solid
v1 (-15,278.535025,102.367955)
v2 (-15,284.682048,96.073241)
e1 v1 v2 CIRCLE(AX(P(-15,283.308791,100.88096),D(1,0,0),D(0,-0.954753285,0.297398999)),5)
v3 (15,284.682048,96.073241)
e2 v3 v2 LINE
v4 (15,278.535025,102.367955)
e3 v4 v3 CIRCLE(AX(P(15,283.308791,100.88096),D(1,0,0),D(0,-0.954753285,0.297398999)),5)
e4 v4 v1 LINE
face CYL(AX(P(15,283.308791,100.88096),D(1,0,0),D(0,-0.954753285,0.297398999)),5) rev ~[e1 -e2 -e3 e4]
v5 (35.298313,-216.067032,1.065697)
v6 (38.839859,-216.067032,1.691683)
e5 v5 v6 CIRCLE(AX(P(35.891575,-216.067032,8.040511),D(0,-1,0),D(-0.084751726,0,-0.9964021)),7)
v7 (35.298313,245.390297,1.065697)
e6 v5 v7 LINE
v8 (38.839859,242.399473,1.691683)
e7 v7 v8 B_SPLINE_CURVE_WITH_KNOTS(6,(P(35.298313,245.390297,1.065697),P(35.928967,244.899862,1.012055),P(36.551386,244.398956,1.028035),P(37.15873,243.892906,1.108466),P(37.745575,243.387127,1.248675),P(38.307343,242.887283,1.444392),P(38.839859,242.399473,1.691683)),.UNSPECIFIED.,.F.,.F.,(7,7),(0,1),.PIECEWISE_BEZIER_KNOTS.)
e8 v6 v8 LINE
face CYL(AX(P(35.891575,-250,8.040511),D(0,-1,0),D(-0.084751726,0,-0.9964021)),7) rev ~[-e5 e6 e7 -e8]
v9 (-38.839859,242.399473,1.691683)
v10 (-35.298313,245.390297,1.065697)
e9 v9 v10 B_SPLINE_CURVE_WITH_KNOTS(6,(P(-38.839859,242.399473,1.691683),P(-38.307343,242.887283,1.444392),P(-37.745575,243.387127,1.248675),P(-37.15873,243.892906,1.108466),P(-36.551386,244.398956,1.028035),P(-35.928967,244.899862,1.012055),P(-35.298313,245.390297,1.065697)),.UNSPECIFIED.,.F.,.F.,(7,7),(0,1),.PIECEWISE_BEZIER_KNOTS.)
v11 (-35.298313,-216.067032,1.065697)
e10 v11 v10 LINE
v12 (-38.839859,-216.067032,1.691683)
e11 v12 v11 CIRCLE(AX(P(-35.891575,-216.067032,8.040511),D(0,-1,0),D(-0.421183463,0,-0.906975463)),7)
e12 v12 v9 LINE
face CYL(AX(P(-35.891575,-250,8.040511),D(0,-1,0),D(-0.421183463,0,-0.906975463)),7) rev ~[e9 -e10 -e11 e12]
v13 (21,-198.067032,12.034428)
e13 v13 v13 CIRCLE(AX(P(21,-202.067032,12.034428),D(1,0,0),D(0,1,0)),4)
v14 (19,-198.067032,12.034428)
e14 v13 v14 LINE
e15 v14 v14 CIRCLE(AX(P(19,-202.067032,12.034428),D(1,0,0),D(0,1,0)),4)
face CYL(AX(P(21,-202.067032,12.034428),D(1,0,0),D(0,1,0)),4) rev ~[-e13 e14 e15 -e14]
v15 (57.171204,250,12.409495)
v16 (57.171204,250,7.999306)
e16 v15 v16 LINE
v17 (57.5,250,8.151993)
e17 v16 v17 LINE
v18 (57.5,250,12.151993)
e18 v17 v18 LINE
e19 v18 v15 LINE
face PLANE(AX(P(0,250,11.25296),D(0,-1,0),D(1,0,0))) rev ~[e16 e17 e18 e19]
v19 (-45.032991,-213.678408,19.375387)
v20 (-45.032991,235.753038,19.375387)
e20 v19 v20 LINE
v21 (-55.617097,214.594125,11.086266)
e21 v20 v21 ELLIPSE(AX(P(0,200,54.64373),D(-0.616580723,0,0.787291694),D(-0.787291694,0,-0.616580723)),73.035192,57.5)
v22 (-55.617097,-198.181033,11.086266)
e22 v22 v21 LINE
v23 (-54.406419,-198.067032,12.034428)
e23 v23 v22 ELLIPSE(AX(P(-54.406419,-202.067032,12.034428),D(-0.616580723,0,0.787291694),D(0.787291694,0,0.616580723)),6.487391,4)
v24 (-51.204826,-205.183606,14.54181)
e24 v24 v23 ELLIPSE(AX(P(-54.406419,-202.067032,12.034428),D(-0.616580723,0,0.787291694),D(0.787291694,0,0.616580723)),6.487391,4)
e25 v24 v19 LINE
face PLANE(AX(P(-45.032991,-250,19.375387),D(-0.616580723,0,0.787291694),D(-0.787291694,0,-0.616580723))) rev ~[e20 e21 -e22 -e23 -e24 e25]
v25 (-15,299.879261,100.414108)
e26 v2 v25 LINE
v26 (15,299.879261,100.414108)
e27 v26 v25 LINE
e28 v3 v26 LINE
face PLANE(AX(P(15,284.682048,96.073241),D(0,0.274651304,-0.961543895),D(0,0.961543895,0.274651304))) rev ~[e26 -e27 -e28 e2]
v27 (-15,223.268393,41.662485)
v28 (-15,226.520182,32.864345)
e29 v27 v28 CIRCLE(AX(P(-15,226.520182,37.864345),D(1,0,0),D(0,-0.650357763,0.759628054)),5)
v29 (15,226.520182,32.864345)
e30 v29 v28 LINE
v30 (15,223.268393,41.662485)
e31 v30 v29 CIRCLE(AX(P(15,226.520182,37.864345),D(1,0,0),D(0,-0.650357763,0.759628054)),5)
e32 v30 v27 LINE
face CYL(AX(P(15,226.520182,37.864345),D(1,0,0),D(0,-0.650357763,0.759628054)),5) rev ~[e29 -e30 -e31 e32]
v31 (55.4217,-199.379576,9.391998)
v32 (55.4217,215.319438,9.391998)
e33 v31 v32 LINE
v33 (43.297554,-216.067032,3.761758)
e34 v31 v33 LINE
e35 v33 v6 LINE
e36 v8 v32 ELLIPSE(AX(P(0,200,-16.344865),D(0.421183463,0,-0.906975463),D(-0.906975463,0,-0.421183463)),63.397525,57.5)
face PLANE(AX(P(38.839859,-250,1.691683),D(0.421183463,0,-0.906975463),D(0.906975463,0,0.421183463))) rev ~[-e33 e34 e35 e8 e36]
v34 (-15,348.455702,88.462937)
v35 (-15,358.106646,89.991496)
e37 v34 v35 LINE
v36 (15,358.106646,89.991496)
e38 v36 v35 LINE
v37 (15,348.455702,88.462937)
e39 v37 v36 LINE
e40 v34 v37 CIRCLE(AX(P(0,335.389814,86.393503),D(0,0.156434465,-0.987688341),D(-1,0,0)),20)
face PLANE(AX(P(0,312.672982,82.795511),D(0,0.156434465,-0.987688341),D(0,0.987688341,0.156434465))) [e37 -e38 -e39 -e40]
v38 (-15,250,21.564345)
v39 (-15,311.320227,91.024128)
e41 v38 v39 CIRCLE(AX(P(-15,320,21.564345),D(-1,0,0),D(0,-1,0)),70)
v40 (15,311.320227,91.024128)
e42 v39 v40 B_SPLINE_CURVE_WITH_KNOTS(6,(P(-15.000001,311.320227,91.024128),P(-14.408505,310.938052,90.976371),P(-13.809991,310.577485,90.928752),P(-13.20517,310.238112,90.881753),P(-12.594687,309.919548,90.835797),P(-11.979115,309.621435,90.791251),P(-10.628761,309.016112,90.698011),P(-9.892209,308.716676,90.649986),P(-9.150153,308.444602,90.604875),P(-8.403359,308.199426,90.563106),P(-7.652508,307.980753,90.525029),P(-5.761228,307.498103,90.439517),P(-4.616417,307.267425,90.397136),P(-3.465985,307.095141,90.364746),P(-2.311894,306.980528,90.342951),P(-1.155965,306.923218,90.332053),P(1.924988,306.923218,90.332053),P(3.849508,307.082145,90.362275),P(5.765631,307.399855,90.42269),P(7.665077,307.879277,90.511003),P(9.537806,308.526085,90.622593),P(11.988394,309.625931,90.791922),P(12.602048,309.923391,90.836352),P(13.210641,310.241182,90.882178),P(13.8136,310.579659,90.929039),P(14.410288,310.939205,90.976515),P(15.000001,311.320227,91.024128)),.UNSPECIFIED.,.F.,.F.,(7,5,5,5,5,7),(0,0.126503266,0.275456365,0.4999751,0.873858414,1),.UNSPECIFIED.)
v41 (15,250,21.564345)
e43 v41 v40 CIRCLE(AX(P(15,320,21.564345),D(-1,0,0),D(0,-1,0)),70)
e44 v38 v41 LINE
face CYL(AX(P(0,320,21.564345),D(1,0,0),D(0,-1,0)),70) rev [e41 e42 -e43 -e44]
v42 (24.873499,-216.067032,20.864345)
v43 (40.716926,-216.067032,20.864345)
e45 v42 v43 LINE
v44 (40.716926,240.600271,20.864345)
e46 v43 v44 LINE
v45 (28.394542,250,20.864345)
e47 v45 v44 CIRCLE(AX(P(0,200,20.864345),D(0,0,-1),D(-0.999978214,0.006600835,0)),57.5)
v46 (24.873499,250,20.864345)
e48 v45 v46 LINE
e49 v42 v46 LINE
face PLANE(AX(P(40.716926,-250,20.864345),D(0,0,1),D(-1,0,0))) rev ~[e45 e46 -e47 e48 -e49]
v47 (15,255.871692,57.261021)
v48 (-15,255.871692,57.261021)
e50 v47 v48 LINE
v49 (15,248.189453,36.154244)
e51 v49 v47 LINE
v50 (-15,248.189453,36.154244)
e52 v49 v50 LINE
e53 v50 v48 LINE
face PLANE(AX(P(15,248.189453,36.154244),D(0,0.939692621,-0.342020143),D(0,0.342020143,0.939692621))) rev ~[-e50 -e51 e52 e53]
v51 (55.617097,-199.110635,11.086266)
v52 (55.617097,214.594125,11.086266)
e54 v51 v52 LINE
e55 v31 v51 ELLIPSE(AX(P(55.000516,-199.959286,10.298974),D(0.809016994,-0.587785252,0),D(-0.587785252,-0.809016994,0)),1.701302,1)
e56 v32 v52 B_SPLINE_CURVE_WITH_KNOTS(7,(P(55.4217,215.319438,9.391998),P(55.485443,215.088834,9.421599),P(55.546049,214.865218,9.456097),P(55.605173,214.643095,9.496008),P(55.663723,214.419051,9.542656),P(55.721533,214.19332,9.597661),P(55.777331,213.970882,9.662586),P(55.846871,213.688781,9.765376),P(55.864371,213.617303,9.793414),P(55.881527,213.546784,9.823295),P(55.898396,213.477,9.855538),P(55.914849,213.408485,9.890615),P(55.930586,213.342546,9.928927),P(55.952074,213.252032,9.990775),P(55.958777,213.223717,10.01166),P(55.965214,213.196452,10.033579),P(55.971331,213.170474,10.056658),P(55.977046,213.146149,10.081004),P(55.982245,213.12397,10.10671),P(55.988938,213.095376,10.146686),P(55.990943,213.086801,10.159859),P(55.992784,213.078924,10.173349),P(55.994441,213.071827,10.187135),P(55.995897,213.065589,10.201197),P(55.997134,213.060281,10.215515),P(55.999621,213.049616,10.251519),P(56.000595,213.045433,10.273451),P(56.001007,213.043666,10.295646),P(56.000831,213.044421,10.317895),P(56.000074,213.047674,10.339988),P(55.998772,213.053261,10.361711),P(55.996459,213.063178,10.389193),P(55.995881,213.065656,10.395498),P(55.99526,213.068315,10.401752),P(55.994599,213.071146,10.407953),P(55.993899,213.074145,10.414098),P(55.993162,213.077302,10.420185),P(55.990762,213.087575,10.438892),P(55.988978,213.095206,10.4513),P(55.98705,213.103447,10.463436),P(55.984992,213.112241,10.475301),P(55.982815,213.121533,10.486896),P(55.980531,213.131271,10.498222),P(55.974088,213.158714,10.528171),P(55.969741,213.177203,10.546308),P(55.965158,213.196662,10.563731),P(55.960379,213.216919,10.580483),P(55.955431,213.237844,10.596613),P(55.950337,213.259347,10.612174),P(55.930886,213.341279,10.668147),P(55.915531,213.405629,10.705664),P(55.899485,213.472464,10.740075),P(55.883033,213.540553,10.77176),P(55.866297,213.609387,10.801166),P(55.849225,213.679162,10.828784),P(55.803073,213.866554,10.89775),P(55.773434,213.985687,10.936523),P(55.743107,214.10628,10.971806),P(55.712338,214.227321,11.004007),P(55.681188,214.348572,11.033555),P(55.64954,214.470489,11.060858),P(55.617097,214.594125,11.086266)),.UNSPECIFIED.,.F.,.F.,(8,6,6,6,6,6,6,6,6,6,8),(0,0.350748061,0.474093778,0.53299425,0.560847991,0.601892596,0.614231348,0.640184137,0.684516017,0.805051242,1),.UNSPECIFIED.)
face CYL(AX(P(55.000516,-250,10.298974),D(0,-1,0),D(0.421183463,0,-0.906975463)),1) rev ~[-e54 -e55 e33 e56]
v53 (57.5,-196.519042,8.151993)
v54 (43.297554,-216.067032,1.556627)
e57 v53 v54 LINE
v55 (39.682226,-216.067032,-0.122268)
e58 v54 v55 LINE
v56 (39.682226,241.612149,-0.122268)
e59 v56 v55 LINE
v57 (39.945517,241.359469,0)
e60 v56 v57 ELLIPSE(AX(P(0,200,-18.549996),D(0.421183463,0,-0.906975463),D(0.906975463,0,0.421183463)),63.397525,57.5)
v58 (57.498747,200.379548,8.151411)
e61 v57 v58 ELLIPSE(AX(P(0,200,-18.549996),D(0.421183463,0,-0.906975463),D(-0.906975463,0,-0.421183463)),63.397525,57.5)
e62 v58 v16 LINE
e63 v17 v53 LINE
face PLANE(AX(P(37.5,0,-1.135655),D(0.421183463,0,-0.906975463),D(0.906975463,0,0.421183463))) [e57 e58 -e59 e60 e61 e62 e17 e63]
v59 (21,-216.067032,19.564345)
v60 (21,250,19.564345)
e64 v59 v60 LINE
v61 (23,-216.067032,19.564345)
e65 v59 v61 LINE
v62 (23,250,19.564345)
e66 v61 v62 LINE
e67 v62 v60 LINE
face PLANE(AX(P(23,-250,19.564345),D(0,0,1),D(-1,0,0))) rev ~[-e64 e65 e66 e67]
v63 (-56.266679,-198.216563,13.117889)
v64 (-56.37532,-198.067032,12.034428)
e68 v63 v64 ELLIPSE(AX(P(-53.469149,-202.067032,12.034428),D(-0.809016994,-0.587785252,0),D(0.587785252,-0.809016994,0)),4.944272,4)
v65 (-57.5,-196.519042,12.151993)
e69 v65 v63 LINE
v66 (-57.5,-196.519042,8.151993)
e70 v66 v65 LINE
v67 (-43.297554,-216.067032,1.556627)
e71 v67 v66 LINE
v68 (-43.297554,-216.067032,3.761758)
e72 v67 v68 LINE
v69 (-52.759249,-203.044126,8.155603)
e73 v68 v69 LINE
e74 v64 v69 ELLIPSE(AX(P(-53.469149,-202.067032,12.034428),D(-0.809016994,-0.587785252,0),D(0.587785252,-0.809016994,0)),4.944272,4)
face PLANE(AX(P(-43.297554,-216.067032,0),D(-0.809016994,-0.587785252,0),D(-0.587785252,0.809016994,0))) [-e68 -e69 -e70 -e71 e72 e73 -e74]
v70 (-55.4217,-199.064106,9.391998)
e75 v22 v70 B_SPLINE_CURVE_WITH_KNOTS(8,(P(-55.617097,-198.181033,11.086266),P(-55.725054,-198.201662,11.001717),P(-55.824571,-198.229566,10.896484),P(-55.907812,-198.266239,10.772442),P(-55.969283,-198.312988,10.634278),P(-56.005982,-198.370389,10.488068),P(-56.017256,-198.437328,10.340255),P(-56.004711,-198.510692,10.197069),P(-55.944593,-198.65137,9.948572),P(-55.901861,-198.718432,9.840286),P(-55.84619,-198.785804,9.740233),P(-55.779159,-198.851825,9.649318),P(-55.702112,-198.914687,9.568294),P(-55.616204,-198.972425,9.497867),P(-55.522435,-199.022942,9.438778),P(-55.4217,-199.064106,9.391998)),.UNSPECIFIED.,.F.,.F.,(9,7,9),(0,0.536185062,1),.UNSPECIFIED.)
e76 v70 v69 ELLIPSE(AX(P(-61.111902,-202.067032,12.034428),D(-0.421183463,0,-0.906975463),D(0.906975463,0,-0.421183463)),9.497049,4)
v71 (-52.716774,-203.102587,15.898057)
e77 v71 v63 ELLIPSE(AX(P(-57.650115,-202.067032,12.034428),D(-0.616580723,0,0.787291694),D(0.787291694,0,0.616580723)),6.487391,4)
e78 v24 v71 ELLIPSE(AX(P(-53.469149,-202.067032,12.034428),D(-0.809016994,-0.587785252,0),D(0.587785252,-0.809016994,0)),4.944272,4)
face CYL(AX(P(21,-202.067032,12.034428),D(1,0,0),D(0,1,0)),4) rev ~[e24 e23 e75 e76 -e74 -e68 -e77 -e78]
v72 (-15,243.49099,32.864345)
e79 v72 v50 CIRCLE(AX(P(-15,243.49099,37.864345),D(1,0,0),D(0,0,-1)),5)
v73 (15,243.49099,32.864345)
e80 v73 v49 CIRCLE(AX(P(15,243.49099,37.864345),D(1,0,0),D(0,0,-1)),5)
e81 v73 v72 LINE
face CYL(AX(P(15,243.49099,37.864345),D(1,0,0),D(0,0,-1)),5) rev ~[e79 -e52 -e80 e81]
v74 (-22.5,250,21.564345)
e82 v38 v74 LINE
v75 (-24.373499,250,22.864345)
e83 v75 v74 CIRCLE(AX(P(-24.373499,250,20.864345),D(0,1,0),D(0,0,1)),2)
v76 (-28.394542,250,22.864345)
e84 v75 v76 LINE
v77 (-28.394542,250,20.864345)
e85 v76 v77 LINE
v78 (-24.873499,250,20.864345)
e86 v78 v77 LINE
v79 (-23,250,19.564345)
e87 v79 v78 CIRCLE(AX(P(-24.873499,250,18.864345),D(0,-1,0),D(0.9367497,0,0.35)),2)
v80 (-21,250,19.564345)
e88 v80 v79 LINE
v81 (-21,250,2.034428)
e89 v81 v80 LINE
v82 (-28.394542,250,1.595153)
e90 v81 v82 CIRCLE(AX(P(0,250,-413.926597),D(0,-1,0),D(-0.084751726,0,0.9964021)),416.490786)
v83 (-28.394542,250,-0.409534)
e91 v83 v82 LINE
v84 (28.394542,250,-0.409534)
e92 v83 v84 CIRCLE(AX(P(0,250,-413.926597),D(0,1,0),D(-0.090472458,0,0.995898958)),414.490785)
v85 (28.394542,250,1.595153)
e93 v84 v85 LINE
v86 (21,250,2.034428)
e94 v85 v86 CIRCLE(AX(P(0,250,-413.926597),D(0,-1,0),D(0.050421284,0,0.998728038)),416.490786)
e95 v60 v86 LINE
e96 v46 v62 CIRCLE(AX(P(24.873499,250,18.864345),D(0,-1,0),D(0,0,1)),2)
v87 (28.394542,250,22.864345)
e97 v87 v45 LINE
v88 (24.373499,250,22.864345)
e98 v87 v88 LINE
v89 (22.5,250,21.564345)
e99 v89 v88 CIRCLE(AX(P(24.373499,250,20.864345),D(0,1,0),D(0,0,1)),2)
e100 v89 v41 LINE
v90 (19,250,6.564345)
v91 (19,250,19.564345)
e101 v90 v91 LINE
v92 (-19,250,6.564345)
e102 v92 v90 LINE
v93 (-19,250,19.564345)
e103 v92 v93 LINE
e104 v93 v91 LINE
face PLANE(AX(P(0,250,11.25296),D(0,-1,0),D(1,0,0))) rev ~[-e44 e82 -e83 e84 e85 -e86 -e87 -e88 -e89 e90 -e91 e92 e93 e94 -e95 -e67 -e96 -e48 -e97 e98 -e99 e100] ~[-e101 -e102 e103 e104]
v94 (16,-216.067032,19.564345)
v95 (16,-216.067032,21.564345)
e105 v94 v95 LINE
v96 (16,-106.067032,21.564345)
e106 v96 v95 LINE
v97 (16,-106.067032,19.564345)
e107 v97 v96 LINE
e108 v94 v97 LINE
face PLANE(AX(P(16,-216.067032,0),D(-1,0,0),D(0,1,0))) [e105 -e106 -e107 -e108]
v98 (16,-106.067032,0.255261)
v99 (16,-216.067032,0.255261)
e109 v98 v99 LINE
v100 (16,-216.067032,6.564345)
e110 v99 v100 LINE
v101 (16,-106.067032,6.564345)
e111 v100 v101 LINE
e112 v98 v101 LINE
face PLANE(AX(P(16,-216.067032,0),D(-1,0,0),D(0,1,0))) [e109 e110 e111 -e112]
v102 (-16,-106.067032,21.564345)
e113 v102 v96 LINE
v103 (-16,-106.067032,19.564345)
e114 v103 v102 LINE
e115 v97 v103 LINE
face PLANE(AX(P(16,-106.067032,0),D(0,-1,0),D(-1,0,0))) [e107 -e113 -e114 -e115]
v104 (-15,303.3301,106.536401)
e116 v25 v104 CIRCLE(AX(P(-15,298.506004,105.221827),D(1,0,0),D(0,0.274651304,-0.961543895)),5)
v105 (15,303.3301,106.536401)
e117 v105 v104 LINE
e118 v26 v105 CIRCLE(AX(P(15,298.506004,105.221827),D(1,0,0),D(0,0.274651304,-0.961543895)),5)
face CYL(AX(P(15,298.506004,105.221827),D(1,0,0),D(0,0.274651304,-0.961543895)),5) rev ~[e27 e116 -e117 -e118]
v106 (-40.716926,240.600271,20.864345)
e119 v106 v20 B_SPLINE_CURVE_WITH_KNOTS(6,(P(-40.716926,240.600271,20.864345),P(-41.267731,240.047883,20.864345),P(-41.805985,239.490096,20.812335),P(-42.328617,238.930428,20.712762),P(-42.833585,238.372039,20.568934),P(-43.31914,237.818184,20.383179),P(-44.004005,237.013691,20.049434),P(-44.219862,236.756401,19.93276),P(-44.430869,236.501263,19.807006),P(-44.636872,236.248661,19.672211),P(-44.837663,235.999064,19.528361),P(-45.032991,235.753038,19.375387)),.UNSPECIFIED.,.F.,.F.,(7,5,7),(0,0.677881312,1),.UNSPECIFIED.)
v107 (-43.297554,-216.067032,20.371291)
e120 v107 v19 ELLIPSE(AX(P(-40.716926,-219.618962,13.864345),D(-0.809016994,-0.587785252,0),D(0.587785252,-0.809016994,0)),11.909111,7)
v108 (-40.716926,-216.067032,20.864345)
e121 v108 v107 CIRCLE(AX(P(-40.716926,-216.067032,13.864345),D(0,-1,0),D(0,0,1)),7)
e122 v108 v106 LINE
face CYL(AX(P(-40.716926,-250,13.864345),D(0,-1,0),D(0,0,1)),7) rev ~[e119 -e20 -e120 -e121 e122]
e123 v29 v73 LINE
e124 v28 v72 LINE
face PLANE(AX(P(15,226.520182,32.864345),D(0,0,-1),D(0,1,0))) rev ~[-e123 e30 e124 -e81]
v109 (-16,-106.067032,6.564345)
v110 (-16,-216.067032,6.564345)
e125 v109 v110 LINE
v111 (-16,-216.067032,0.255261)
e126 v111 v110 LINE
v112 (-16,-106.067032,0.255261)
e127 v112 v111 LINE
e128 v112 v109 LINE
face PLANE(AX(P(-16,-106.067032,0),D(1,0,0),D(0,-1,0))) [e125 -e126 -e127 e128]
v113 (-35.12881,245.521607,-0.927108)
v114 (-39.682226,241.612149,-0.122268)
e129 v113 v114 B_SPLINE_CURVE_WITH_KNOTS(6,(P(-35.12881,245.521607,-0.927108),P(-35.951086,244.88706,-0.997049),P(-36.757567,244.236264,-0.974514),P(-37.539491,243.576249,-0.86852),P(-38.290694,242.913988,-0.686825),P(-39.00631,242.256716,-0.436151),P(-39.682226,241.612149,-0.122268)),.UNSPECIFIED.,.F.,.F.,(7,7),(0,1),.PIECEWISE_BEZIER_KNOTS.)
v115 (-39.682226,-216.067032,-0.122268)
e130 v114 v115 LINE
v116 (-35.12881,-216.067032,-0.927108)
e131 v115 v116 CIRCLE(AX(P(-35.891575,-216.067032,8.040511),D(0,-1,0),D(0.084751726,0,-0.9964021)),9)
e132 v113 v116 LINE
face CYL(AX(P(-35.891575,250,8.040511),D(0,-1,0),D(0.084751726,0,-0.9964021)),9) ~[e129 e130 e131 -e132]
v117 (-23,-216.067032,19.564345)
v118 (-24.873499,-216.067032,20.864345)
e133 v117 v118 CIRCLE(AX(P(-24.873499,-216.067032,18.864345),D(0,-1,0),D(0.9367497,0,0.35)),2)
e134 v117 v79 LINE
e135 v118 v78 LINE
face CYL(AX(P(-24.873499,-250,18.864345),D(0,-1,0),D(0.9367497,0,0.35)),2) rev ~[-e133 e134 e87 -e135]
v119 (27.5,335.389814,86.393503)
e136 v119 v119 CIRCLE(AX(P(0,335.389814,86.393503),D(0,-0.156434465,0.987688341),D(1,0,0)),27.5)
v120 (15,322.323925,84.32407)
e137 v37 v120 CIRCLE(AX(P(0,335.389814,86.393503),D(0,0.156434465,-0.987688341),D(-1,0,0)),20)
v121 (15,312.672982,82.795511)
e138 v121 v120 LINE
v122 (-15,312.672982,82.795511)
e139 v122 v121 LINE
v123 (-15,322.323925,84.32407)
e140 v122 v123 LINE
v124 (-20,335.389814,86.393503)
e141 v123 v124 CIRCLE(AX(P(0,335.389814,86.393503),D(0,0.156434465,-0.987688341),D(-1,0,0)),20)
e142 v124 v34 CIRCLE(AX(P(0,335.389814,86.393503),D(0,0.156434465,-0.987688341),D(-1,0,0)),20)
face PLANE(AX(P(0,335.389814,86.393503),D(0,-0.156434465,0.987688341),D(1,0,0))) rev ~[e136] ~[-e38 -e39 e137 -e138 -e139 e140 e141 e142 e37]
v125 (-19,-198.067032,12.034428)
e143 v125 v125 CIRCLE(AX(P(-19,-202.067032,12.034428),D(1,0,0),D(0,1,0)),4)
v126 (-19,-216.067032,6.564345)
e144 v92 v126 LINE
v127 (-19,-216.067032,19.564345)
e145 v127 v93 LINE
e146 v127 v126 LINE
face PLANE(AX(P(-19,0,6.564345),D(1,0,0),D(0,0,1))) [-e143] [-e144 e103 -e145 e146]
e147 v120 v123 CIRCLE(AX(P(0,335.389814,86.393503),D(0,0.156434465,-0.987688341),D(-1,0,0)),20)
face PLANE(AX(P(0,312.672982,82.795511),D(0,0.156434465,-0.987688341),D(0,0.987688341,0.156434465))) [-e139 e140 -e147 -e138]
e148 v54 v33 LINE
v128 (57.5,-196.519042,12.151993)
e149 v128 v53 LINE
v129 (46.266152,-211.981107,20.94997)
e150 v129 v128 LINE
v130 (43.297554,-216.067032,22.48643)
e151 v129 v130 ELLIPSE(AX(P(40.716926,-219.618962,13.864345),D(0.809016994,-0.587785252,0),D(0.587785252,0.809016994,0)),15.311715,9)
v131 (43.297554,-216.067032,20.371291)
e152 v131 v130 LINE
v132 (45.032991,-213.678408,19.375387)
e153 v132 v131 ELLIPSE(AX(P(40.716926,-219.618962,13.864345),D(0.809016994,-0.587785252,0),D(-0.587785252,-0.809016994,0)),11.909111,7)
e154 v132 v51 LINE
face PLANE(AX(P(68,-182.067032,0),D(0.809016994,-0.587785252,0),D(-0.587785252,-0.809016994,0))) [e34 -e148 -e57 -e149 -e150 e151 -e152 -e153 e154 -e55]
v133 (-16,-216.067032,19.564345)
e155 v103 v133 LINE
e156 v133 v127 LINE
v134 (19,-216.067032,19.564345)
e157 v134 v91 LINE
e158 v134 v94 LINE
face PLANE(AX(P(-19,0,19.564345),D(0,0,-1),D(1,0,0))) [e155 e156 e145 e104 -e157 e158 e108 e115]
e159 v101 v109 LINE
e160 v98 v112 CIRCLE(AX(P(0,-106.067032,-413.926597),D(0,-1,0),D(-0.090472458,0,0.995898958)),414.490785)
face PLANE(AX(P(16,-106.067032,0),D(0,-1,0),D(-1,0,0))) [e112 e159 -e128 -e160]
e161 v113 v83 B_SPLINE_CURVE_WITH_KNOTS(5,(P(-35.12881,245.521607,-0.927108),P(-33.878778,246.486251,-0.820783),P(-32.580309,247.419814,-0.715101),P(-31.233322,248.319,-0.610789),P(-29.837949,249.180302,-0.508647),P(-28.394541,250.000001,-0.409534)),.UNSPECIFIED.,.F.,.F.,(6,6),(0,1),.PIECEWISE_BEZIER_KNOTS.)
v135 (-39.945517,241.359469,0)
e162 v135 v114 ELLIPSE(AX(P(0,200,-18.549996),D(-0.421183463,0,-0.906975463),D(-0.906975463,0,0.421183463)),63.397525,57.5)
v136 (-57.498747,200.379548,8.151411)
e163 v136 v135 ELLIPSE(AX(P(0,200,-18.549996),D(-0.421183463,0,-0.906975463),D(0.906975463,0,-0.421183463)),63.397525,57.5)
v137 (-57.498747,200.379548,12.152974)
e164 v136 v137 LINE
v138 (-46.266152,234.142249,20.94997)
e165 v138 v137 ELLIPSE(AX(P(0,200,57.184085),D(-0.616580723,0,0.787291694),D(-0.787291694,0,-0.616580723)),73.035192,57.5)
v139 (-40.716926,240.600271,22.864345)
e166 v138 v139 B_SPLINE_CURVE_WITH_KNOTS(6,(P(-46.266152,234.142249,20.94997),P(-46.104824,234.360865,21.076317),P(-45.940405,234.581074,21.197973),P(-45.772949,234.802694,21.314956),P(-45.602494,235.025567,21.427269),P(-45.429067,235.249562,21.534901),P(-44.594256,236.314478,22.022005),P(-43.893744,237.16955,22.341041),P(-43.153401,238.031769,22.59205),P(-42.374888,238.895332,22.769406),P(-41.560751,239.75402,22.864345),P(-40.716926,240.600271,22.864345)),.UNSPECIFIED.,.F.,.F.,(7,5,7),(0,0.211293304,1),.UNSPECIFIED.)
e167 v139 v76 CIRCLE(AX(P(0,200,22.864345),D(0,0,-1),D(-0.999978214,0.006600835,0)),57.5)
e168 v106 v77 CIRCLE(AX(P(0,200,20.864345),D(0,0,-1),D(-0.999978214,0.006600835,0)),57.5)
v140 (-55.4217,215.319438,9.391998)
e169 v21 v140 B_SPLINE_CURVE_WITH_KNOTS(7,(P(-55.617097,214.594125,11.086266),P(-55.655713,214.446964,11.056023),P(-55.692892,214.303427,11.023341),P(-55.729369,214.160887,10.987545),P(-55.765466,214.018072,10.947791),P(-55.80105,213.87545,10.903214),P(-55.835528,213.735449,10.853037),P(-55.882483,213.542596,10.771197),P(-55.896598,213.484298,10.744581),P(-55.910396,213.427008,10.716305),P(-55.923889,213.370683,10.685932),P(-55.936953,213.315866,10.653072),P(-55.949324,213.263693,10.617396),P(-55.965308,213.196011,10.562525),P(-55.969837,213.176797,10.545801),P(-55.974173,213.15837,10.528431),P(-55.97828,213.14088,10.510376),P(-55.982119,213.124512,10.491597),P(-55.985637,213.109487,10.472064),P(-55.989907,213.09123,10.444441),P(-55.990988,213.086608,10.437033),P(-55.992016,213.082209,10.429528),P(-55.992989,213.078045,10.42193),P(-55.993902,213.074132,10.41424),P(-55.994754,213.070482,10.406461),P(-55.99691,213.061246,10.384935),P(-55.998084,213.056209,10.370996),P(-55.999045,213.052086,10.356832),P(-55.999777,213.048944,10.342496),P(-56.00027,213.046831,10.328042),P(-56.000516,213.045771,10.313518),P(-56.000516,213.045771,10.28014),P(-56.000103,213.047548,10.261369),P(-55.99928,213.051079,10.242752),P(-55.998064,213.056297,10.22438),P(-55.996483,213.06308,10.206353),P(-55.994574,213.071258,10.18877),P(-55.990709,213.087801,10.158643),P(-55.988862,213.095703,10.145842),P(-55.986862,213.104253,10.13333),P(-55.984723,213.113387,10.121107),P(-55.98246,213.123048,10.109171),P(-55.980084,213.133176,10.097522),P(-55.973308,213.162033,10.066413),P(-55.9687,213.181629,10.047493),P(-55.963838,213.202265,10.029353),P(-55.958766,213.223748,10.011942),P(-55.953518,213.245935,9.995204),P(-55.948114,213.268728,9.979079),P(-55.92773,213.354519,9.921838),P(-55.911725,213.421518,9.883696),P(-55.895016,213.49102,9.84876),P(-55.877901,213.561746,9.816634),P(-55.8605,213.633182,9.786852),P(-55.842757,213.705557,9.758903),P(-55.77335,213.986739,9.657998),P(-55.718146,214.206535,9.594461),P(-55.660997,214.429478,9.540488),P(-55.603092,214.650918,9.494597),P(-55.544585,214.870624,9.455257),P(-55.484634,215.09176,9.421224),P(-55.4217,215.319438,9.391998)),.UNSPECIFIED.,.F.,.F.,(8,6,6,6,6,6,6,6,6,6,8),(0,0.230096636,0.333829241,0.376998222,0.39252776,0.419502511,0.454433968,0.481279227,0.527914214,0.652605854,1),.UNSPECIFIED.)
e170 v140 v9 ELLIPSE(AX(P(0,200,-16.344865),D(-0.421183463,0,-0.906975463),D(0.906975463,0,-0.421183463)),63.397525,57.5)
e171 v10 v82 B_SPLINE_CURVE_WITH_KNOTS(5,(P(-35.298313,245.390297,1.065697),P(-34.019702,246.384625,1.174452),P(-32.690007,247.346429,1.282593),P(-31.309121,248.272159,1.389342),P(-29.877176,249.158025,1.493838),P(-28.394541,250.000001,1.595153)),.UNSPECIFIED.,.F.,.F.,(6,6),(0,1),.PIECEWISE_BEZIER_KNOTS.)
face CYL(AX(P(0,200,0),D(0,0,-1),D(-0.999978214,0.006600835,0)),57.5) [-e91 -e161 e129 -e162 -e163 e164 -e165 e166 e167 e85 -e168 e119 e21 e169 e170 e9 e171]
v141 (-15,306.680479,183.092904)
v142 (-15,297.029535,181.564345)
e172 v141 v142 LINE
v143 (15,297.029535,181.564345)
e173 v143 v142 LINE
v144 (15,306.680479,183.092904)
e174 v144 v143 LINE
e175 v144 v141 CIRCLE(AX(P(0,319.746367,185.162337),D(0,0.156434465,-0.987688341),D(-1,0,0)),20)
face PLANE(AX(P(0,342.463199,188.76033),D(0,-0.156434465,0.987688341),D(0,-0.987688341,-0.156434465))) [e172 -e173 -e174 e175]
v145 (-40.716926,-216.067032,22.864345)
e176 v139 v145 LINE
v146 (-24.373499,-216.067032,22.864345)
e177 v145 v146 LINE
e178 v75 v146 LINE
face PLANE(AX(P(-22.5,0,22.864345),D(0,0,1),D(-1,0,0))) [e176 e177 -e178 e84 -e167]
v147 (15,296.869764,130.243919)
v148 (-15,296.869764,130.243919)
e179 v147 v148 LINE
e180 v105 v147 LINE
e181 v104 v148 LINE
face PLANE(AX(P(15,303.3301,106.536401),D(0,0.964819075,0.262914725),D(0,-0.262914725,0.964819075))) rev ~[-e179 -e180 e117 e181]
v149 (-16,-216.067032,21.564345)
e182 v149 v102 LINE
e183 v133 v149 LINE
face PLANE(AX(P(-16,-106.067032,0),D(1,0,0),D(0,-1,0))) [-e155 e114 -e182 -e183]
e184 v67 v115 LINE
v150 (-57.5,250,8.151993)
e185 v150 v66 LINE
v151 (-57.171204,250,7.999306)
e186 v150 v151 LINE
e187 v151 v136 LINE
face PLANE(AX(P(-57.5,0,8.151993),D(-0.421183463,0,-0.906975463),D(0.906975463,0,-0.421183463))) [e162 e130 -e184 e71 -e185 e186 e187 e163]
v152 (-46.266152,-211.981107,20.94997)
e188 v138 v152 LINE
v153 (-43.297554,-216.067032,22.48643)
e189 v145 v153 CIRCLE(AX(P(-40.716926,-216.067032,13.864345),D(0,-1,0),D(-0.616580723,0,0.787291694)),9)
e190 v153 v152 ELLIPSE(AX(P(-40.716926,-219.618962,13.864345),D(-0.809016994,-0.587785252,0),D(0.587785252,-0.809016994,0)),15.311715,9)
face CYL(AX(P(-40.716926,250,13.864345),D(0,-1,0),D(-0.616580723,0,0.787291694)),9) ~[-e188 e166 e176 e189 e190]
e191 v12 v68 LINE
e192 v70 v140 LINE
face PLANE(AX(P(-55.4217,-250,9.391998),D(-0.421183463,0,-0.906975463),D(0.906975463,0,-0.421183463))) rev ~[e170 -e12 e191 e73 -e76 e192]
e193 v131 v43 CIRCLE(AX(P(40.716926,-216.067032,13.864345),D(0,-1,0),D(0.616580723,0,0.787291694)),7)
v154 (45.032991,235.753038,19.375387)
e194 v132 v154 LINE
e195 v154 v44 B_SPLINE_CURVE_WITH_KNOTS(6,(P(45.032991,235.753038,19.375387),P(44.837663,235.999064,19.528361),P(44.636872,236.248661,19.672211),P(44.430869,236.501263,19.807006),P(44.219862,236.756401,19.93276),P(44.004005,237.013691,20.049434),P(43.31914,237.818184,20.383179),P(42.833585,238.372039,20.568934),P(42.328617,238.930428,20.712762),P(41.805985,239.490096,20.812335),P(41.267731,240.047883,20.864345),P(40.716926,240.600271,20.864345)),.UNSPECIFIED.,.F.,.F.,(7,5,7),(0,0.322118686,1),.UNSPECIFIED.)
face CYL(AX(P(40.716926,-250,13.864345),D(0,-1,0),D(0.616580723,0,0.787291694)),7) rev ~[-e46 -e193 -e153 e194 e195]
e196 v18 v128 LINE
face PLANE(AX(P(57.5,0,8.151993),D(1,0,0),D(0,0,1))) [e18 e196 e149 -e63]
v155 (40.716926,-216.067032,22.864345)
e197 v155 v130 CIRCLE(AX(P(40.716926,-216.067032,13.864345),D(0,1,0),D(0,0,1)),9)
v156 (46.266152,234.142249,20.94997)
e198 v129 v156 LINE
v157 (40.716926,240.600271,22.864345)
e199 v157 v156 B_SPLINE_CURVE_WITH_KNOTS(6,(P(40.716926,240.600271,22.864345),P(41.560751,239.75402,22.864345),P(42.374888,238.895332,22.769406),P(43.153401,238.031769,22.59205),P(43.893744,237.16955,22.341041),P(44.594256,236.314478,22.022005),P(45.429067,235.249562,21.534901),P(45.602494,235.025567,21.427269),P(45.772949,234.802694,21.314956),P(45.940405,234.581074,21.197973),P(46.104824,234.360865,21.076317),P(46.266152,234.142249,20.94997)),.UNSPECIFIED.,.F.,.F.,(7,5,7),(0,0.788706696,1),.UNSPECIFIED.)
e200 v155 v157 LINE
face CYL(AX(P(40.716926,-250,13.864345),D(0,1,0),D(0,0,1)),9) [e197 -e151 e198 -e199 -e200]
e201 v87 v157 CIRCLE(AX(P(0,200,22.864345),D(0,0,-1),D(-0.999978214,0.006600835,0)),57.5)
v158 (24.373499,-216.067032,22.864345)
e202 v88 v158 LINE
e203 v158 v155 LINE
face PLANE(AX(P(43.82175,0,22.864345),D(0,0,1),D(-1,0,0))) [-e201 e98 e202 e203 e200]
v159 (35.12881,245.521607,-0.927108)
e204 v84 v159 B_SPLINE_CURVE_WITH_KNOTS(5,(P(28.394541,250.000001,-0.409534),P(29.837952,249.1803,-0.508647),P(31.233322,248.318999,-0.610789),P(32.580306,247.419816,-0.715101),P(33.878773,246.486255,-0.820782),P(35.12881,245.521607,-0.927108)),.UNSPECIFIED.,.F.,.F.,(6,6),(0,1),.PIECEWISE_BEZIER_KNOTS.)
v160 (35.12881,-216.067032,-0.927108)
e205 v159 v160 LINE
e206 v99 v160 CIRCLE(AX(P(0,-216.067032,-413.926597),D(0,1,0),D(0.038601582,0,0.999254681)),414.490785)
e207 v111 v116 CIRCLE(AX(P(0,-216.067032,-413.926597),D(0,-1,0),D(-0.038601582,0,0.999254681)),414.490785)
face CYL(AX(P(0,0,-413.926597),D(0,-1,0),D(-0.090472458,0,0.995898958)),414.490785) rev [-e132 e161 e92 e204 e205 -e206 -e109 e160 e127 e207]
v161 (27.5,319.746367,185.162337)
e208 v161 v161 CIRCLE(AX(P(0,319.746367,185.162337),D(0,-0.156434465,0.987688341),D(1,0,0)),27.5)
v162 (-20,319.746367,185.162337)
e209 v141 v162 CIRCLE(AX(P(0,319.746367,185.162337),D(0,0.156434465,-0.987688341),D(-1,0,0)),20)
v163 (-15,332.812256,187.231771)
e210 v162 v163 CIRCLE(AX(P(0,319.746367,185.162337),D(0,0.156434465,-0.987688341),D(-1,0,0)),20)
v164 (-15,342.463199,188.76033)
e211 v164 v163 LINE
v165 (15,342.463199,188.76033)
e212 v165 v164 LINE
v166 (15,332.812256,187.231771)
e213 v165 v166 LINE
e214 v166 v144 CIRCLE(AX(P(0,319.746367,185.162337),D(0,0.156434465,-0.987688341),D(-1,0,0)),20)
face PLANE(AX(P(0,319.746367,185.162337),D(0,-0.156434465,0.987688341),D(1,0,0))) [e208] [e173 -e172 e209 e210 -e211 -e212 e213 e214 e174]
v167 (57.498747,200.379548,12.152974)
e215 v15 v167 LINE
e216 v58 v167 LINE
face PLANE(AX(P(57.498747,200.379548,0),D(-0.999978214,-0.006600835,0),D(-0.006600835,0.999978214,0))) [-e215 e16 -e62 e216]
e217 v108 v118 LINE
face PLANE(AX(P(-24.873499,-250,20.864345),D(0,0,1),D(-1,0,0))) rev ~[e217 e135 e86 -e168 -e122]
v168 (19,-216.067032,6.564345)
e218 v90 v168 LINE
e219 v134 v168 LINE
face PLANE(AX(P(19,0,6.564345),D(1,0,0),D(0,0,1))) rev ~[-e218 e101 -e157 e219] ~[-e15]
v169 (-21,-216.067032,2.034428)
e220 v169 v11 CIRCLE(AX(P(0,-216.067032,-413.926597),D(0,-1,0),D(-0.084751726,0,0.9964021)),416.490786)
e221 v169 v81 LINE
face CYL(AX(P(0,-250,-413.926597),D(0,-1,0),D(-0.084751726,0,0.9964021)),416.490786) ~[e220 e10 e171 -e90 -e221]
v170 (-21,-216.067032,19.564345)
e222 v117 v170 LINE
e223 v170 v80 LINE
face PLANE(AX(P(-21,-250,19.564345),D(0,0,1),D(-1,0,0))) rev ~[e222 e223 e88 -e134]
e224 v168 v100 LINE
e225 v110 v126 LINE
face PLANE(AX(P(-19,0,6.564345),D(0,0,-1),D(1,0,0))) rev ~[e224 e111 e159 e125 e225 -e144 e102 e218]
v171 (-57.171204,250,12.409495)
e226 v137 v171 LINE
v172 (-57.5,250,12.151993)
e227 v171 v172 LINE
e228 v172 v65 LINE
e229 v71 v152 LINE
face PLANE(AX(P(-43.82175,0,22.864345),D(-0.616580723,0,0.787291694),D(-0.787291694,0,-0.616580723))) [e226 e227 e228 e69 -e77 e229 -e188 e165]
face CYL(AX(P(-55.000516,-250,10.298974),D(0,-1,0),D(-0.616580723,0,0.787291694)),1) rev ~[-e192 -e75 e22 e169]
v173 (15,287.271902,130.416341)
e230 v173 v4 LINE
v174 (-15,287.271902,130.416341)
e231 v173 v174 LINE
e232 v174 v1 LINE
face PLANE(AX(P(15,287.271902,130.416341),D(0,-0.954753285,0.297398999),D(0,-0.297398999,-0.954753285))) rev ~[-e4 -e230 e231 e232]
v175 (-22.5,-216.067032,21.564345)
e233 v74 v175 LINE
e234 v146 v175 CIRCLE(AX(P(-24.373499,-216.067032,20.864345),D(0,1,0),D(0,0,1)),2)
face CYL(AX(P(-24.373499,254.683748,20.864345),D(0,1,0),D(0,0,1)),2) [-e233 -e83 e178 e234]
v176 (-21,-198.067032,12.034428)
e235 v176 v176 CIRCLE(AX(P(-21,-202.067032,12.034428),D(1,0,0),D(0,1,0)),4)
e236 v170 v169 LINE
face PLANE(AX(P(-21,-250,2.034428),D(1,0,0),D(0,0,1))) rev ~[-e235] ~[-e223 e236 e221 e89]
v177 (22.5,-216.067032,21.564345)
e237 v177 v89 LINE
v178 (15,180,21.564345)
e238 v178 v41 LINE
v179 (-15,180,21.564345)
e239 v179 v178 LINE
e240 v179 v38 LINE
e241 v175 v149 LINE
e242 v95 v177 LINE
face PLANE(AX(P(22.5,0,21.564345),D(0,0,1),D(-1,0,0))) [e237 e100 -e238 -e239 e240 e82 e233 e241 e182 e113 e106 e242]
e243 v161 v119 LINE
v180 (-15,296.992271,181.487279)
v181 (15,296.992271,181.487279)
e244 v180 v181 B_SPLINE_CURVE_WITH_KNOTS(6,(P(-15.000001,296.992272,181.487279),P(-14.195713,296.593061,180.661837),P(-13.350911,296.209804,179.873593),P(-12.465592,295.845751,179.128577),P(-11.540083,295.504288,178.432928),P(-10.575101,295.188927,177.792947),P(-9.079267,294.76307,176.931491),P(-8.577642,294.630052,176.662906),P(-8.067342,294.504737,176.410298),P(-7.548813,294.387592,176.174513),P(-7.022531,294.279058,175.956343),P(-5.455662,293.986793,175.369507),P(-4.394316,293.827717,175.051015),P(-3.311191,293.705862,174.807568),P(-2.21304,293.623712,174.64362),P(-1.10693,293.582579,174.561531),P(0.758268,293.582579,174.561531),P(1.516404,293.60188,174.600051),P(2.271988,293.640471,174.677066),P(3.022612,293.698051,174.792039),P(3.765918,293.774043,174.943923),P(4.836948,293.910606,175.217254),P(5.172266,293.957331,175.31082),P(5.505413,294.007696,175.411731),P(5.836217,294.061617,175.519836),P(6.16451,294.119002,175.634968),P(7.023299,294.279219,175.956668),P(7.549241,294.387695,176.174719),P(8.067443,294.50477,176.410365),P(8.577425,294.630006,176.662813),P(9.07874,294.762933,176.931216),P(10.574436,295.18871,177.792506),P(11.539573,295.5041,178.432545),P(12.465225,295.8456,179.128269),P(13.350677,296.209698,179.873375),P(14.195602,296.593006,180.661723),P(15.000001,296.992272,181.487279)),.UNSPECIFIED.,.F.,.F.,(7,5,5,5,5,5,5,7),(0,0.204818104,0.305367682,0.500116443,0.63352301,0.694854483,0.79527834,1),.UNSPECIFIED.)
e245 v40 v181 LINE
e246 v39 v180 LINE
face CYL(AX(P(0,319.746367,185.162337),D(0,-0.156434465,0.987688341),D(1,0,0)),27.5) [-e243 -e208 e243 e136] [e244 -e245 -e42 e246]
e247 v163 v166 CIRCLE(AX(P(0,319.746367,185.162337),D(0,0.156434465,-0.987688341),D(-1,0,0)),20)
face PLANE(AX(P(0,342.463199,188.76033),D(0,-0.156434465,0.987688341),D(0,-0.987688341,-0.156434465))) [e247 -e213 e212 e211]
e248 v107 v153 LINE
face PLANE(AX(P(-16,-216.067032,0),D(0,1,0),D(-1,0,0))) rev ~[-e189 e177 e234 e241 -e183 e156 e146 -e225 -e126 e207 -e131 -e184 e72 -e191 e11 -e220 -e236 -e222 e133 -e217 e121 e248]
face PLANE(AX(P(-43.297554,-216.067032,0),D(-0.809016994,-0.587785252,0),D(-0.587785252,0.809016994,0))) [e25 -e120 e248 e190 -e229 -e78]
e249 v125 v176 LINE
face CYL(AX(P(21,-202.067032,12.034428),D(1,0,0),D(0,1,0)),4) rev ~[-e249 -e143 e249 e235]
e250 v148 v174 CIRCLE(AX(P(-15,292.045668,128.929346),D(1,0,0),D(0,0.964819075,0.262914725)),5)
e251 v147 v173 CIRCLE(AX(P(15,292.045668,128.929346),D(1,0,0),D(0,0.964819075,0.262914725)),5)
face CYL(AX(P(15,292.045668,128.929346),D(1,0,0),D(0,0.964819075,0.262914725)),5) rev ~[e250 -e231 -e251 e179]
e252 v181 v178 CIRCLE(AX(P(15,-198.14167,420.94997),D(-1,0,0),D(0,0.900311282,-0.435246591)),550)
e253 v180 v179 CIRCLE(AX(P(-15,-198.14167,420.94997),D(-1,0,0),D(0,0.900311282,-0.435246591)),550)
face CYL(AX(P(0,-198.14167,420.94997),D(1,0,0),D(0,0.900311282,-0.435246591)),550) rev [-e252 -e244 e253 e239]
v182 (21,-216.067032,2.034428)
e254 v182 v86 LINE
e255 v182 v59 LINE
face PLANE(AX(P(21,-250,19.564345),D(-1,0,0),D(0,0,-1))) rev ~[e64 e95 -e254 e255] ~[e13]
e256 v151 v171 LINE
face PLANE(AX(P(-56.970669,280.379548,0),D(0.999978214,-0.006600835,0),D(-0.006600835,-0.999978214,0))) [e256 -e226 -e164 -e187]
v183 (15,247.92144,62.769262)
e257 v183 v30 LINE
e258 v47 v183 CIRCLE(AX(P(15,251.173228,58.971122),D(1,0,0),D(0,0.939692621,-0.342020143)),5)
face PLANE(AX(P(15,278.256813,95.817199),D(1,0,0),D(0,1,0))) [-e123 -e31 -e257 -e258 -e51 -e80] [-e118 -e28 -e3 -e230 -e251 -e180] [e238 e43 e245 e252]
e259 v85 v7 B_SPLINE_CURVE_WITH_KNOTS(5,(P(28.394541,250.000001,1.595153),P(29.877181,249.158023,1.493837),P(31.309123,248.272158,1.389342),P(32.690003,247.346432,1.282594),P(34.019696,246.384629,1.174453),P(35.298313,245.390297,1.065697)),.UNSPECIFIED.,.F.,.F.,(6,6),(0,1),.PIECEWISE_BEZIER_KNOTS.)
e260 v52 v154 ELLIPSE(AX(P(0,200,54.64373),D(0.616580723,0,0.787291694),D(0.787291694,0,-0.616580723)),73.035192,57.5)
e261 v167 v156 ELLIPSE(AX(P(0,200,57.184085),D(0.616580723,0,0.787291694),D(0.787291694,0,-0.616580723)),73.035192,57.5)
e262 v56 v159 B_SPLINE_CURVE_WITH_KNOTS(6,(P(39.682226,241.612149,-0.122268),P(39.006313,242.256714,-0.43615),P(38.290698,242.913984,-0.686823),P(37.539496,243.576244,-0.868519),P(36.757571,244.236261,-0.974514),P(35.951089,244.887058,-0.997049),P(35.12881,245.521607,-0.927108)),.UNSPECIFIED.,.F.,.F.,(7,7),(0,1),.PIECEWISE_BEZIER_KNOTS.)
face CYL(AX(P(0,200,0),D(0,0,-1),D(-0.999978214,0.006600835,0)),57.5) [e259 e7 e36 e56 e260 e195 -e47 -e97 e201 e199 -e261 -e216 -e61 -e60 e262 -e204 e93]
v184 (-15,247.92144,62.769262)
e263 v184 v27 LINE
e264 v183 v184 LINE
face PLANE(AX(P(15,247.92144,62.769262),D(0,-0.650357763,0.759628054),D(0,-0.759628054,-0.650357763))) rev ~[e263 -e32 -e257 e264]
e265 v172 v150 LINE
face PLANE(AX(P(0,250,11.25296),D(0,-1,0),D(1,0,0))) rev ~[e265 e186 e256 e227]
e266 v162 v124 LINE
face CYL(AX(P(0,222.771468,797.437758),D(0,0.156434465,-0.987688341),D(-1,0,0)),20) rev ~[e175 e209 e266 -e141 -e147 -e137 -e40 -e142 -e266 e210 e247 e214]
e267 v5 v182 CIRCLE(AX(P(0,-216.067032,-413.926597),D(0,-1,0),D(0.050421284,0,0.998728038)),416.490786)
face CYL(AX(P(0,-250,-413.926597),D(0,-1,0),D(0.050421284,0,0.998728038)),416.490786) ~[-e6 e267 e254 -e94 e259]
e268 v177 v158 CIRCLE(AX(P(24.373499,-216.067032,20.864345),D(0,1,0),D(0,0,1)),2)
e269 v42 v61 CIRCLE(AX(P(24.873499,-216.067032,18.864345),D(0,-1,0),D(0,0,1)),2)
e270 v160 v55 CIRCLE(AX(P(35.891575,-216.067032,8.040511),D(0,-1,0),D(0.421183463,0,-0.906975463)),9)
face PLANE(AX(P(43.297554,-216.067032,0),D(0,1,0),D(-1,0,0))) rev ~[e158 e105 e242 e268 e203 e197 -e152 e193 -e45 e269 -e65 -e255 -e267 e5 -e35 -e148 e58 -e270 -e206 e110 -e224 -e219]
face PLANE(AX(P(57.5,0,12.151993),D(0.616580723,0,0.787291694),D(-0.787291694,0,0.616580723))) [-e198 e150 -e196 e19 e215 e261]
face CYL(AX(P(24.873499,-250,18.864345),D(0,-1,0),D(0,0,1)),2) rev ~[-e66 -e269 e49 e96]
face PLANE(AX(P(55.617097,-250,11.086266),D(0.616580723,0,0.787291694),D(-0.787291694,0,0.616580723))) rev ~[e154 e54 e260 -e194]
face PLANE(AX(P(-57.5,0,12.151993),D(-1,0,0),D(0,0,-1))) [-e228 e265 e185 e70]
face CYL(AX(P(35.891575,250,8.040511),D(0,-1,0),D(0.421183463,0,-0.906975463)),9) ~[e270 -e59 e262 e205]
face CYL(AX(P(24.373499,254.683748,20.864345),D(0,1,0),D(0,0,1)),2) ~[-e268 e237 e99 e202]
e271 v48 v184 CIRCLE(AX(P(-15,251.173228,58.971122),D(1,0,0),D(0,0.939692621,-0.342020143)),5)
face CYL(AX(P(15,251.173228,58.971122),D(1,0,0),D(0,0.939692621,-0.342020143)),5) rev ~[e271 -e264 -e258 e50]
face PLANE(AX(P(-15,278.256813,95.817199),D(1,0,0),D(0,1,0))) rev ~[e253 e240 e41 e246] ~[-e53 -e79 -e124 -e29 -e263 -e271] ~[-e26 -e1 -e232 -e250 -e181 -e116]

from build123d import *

# Parameters (mm, degrees)
F1_DEPTH       = 250
F2_W           = 38
F2_H           = 13
F3_DEPTH       = 250
F4_T1_DEPTH    = 509.3674969976
F5_R           = 9
F7_DEPTH       = 500.001
F9_DEPTH       = 0.9604886552
F9_DEPTH_BACK  = 22.8653446865
F11_DEPTH      = 0.9604887634
F11_DEPTH_BACK = 22.8653447865
F13_DEPTH      = 15
F14_R          = 27.5
F15_DEPTH      = 100
F17_D          = 40
F19_D          = 8
F19_DEPTH      = 78.501
F21_DEPTH      = 72.501


# Not quite as in the source:
# - a fillet or chamfer that OpenCascade refuses, or shapes differently, is made with other operations: its cross-section is extruded or revolved along the edge and cut away or added


with BuildPart() as f1:
    # F0 (on Front) → F1 (new body, symmetric)
    with BuildSketch(Plane.XZ):
        with BuildLine():
            Line((22.5, 21.5643446865), (0, 21.5643446865))
            Line((0, 21.5643446865), (-22.5, 21.5643446865))
            Line((-22.5, 21.5643446865), (-22.5, 22.8643446865))
            Line((-22.5, 22.8643446865), (-43.8217498065, 22.8643446865))
            Line((-43.8217498065, 22.8643446865), (-57.5, 12.151993139))
            Line((-57.5, 12.151993139), (-57.5, 8.151993139))
            Line((-57.5, 8.151993139), (-37.5, -1.1356553135))
            ThreePointArc((-37.5, -1.1356553135), (0, 0.564188832), (37.5, -1.1356553135))
            Line((37.5, -1.1356553135), (57.5, 8.151993139))
            Line((57.5, 8.151993139), (57.5, 12.151993139))
            Line((57.5, 12.151993139), (43.8217498065, 22.8643446865))
            Line((43.8217498065, 22.8643446865), (22.5, 22.8643446865))
            Line((22.5, 22.8643446865), (22.5, 21.5643446865))
        make_face()
    extrude(amount=F1_DEPTH, both=True)

    # F2 (on Front) → F3 (cut, symmetric)
    with BuildSketch(Plane.XZ):
        with Locations((0, 13.0643446865)):
            Rectangle(F2_W, F2_H)
    extrude(amount=F3_DEPTH, both=True, mode=Mode.SUBTRACT)

    # F4: fillet of radius 2 on 2 edges, made by hand

    # F4_s2 → F4_t1 (cut)
    with BuildSketch(Plane.XZ.offset(-254.6837484988)):
        with BuildLine():
            ThreePointArc((-24.3734993995, 22.8643446865), (-23.2333239744, 22.507512359), (-22.5, 21.5643446865))
            Line((-22.5, 21.5643446865), (-22.5, 22.8643446865))
            Line((-22.5, 22.8643446865), (-24.3734993995, 22.8643446865))
        make_face()
        with BuildLine():
            ThreePointArc((24.3734993995, 22.8643446865), (23.2333239744, 22.507512359), (22.5, 21.5643446865))
            Line((22.5, 21.5643446865), (22.5, 22.8643446865))
            Line((22.5, 22.8643446865), (24.3734993995, 22.8643446865))
        make_face()
    extrude(amount=F4_T1_DEPTH, mode=Mode.SUBTRACT)

    # F5
    f5_edges = [f1.edges().sort_by_distance(p)[0] for p in [
        (43.82175, 0, 22.864345),
        (-43.82175, 0, 22.864345),
        (-37.5, 0, -1.135655),
        (37.5, 0, -1.135655),
    ]]
    fillet(f5_edges, radius=F5_R)

    # F6 (on face) → F7 (cut, through all)
    with BuildSketch(Plane.XZ.offset(250)):
        with BuildLine():
            ThreePointArc((-38.8398592766, 1.6916831032), (-37.1099744385, 1.1473623621), (-35.2983129545, 1.0656966447))
            ThreePointArc((-35.2983129545, 1.0656966447), (-28.1533234397, 1.6115661831), (-21, 2.034428437))
            Line((-21, 2.034428437), (-21, 19.5643446865))
            Line((-21, 19.5643446865), (-23, 19.5643446865))
            ThreePointArc((-23, 19.5643446865), (-23.7333239744, 20.507512359), (-24.8734993995, 20.8643446865))
            Line((-24.8734993995, 20.8643446865), (-40.7169256034, 20.8643446865))
            ThreePointArc((-40.7169256034, 20.8643446865), (-42.9997645145, 20.4816437205), (-45.0329906666, 19.3753865454))
            Line((-45.0329906666, 19.3753865454), (-55.617097211, 11.0862656041))
            ThreePointArc((-55.617097211, 11.0862656041), (-55.9939317717, 10.1844048326), (-55.4216999505, 9.3919984469))
            Line((-55.4216999505, 9.3919984469), (-38.8398592766, 1.6916831032))
        make_face()
        with BuildLine():
            Line((21, 19.5643446865), (21, 2.034428437))
            ThreePointArc((21, 2.034428437), (28.1533234397, 1.6115661831), (35.2983129545, 1.0656966447))
            ThreePointArc((35.2983129545, 1.0656966447), (37.1099744385, 1.1473623621), (38.8398592766, 1.6916831032))
            Line((38.8398592766, 1.6916831032), (55.4216999505, 9.3919984469))
            ThreePointArc((55.4216999505, 9.3919984469), (55.9939317717, 10.1844048326), (55.617097211, 11.0862656041))
            Line((55.617097211, 11.0862656041), (45.0329906666, 19.3753865454))
            ThreePointArc((45.0329906666, 19.3753865454), (42.9997645145, 20.4816437205), (40.7169256034, 20.8643446865))
            Line((40.7169256034, 20.8643446865), (24.8734993995, 20.8643446865))
            ThreePointArc((24.8734993995, 20.8643446865), (23.7333239744, 20.507512359), (23, 19.5643446865))
            Line((23, 19.5643446865), (21, 19.5643446865))
        make_face()
    extrude(amount=-F7_DEPTH, mode=Mode.SUBTRACT)

    # F8 (on Top) → F9 (cut, two sides)
    with BuildSketch(Plane.XY) as f9_sk:
        with BuildLine():
            ThreePointArc((-57.4987473195, 200.3795480055), (0, 257.5), (57.4987473195, 200.3795480055))
            Line((57.4987473195, 200.3795480055), (56.9706690247, 280.3795480055))
            Line((56.9706690247, 280.3795480055), (-56.9706690247, 280.3795480055))
            Line((-56.9706690247, 280.3795480055), (-57.4987473195, 200.3795480055))
        make_face()
    extrude(amount=-F9_DEPTH, mode=Mode.SUBTRACT)
    extrude(f9_sk.sketch, amount=F9_DEPTH_BACK, mode=Mode.SUBTRACT)

    # F10 (on Top) → F11 (cut, two sides)
    with BuildSketch(Plane.XY) as f11_sk:
        Polygon((-16, -216.0670316956), (-43.2975540478, -216.0670316956), (-68, -182.0670316956), (-68, -312.0670316956), (0, -312.0670316956), (0, -106.0670316956), (-16, -106.0670316956), align=None)
        Polygon((16, -106.0670316956), (0, -106.0670316956), (0, -312.0670316956), (68, -312.0670316956), (68, -182.0670316956), (43.2975540478, -216.0670316956), (16, -216.0670316956), align=None)
    extrude(amount=-F11_DEPTH, mode=Mode.SUBTRACT)
    extrude(f11_sk.sketch, amount=F11_DEPTH_BACK, mode=Mode.SUBTRACT)

    # F12 (on Right) → F13 (join, symmetric)
    with BuildSketch(Plane.YZ):
        with BuildLine():
            ThreePointArc((297.0295354887, 181.5643446865), (245.7826981398, 96.2483289481), (180, 21.5643446865))
            Line((180, 21.5643446865), (250, 21.5643446865))
            ThreePointArc((250, 21.5643446865), (267.5395947829, 67.9098502341), (311.3687395561, 91.0301732869))
            Line((311.3687395561, 91.0301732869), (312.6729819927, 82.795510627))
            Line((312.6729819927, 82.795510627), (358.1066456601, 89.9914960188))
            Line((358.1066456601, 89.9914960188), (342.4631991561, 188.7603300783))
            Line((342.4631991561, 188.7603300783), (297.0295354887, 181.5643446865))
        make_face()
    extrude(amount=F13_DEPTH, both=True)

    # F14 (on face) → F15 (join, through all)
    with BuildSketch(Plane(origin=(0, -20.7844039253, 131.2275617651), x_dir=(1, 0, 0), z_dir=(0, -0.156434465, 0.9876883406))):
        with Locations((0, 344.775530146)):
            Circle(F14_R)
    extrude(amount=-F15_DEPTH)

    # F17 (through all)
    with Locations(Plane(origin=(0, -20.7844039253, 131.2275617651), x_dir=(1, 0, 0), z_dir=(0, -0.156434465, 0.9876883406))):
        with Locations((0, 344.775530146)):
            Hole(F17_D / 2)

    # F19 (through all, one way)
    with BuildSketch(Plane.YZ.offset(21)):
        with Locations((-202.0670316956, 12.034428437)):
            Circle(F19_D / 2)
    extrude(amount=-F19_DEPTH, mode=Mode.SUBTRACT)

    # F20 (on face) → F21 (cut, through all)
    with BuildSketch(Plane.YZ.offset(15)):
        with BuildLine():
            Line((303.3300998051, 106.5364009657), (296.8697635571, 130.2439192545))
            ThreePointArc((296.8697635571, 130.2439192545), (292.1354764945, 133.9285390129), (287.271901756, 130.4163406247))
            Line((287.271901756, 130.4163406247), (278.5350250255, 102.3679551307))
            ThreePointArc((278.5350250255, 102.3679551307), (279.7315404872, 97.3876414374), (284.6820479704, 96.0732406641))
            Line((284.6820479704, 96.0732406641), (299.8792609489, 100.4141078692))
            ThreePointArc((299.8792609489, 100.4141078692), (302.8617375272, 102.7667124398), (303.3300998051, 106.5364009657))
        make_face()
        with BuildLine():
            ThreePointArc((243.4909897109, 32.8643446865), (246.3588718926, 33.768584465), (248.1894528148, 36.1542439699))
            Line((248.1894528148, 36.1542439699), (255.8716915251, 57.2610213573))
            ThreePointArc((255.8716915251, 57.2610213573), (254.0207530146, 63.0810616952), (247.921439605, 62.7692623419))
            Line((247.921439605, 62.7692623419), (223.2683930345, 41.6624849544))
            ThreePointArc((223.2683930345, 41.6624849544), (221.8302617373, 36.1309522525), (226.5201818507, 32.8643446865))
            Line((226.5201818507, 32.8643446865), (243.4909897109, 32.8643446865))
        make_face()
    extrude(amount=-F21_DEPTH, mode=Mode.SUBTRACT)


solid = f1.part
